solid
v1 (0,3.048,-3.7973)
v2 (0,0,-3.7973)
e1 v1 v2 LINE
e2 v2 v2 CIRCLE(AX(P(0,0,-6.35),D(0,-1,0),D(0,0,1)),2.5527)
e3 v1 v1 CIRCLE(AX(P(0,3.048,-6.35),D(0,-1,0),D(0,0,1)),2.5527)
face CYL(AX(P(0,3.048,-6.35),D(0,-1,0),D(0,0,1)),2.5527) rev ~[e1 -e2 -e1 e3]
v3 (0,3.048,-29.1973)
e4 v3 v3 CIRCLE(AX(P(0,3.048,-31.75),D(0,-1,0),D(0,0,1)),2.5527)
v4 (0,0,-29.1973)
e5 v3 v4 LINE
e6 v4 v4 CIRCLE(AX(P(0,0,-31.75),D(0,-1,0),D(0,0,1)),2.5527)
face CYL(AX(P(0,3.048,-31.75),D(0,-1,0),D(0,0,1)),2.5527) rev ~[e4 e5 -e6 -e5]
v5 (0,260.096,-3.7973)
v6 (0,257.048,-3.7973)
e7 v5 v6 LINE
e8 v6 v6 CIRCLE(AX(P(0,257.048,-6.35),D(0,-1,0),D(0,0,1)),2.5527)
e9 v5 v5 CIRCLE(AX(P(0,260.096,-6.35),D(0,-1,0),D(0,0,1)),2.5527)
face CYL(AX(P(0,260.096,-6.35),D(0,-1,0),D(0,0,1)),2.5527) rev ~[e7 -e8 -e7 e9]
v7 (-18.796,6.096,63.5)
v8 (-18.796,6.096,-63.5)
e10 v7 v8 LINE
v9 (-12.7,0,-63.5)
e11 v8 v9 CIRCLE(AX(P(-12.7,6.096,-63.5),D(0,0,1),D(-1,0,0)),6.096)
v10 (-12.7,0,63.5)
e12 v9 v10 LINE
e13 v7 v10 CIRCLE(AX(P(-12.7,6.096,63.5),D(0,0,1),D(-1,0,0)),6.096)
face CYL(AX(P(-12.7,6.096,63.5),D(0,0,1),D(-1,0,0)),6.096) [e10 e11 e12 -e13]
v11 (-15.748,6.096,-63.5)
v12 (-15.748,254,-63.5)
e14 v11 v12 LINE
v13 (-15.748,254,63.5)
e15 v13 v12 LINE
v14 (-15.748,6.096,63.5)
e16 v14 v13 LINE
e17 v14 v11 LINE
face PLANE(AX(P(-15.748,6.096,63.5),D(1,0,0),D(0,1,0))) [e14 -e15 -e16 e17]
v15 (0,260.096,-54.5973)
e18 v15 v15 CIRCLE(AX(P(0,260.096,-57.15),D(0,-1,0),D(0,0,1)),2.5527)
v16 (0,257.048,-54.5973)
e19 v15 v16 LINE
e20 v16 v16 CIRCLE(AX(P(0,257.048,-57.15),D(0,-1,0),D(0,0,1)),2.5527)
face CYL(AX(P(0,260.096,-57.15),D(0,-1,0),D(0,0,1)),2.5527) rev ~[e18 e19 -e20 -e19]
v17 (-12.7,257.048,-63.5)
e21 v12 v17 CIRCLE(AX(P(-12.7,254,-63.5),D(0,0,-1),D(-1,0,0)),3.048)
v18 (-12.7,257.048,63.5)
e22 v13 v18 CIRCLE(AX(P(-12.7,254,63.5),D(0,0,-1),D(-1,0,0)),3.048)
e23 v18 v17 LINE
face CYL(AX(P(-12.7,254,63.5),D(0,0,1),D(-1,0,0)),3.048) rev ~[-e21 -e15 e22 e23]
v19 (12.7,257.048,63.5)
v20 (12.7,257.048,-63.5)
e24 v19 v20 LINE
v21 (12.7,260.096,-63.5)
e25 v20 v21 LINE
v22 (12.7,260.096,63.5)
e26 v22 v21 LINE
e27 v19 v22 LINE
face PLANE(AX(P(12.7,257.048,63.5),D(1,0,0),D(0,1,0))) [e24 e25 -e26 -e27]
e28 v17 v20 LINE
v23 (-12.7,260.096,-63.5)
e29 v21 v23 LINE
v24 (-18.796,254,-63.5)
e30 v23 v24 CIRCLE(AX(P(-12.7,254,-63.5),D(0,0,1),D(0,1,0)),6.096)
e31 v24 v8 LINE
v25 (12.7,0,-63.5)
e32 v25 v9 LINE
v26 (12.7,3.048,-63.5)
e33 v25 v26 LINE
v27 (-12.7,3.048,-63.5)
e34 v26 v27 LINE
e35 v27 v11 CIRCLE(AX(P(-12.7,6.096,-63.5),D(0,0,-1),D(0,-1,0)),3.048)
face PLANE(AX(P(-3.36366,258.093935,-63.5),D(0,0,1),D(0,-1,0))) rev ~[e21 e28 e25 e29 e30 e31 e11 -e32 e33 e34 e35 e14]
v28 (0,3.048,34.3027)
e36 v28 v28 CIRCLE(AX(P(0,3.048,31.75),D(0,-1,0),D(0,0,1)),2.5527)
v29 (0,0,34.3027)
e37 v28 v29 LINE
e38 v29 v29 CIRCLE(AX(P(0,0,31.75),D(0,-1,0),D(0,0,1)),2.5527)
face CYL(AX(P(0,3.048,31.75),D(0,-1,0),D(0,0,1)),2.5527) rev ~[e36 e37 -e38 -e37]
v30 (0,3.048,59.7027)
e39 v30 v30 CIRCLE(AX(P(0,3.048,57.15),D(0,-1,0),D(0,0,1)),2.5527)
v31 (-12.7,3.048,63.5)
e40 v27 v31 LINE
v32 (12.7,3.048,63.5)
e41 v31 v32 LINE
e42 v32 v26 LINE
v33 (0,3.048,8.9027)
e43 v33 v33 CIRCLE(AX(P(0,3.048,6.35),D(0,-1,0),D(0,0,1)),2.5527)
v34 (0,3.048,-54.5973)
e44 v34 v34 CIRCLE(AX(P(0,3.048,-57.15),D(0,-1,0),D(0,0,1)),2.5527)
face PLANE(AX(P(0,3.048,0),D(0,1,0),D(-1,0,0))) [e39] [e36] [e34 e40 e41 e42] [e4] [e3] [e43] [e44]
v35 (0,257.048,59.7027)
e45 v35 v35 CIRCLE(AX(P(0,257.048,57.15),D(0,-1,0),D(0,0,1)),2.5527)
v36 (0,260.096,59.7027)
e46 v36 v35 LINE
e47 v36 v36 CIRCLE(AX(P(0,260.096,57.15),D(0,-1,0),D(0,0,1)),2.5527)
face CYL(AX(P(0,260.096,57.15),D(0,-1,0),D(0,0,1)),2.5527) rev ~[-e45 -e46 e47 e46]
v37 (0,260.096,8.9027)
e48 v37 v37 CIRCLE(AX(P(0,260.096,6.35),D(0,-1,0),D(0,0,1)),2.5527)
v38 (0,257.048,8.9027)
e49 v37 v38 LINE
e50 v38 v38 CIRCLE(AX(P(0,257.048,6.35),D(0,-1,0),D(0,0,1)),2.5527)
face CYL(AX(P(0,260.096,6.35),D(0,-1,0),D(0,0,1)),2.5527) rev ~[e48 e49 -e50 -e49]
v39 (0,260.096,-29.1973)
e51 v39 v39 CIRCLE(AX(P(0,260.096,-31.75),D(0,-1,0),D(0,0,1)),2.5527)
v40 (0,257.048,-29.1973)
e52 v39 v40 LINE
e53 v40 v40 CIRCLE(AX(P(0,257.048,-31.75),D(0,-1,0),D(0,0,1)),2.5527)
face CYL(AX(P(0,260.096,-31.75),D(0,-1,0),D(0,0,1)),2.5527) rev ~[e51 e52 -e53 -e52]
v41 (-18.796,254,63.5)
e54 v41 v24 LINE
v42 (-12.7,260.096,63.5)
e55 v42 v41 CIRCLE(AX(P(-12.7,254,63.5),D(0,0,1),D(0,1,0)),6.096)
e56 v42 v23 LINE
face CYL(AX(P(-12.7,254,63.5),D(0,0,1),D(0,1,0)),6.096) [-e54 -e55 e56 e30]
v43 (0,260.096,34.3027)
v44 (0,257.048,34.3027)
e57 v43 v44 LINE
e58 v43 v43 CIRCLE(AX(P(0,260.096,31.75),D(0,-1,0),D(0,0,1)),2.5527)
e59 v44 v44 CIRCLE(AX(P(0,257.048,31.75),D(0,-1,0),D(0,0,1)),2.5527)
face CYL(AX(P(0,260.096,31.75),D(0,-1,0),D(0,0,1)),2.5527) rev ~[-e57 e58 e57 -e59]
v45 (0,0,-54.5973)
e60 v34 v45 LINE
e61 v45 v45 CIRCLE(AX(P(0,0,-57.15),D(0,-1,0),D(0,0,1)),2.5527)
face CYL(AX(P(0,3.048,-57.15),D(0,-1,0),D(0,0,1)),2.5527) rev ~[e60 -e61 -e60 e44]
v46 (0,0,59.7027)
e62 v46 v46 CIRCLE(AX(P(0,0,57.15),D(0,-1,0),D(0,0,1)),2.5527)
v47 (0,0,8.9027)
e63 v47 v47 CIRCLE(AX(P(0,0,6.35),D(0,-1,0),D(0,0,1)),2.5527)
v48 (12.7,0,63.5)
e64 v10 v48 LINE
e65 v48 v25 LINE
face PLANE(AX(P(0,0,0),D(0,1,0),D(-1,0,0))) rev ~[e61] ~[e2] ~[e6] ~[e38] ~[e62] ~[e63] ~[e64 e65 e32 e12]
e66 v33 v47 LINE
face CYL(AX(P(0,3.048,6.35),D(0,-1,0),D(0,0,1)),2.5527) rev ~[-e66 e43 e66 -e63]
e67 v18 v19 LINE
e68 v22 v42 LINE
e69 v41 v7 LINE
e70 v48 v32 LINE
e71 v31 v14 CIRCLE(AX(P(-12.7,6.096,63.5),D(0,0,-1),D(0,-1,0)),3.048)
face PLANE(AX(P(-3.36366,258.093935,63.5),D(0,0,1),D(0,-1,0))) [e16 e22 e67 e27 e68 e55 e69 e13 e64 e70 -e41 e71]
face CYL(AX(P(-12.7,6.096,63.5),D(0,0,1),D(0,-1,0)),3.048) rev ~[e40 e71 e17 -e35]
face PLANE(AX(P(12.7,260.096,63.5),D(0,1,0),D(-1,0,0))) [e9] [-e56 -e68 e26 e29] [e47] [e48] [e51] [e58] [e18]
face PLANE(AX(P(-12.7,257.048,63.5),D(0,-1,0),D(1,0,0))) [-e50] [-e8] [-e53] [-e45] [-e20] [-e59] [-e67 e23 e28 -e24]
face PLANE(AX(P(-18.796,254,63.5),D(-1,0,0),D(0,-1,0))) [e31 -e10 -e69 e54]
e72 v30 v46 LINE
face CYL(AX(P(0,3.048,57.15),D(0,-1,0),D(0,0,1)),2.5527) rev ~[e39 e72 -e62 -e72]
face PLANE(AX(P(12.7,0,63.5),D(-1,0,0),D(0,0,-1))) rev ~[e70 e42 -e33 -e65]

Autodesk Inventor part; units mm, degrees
ref_plane "YZ Plane" through (0, 0, 0) normal (1, 0, 0) x (0, 1, 0)
ref_plane "XZ Plane" through (0, 0, 0) normal (0, 1, 0) x (-1, 0, 0)
ref_plane "XY Plane" through (0, 0, 0) normal (0, 0, 1) x (1, 0, 0)
sketch "Sketch1" plane through (0, 0, 0) normal (0, 1, 0) x (-1, 0, 0)
  line L0 (-12.7, -63.5) -> (12.7, -63.5)
  line L1 (12.7, -63.5) -> (12.7, 63.5)
  line L2 (12.7, 63.5) -> (-12.7, 63.5)
  line L3 (-12.7, 63.5) -> (-12.7, -63.5)
  line L4 (-12.7, -63.5) -> (12.7, 63.5) construction
  line L5 (12.7, -63.5) -> (-12.7, 63.5) construction
  point P0 (0, 0)
  dimension "d0" = 25.4
  dimension "d1" = 127
extrude "Plate1" add sketch "Sketch1" along normal blind 3.048
sketch "Sketch2" plane through (-15.748, 6.096, 63.5) normal (-1, 0, 0) x (0, -1, 0)
  line L0 (0, -127) -> (0, 0)
  line L1 (0, 0) -> (-247.904, 0)
  line L2 (-247.904, 0) -> (-247.904, -127)
  line L3 (-247.904, -127) -> (0, -127)
edge flange "Flange1" height 254 angle 90 thickness 3.048 bend radius 3.048 thickness toward (-1, 0, 0) relief tear relief width 3.048 relief depth 1.524 edges at (-12.7, 3.048, 0) wall of the first edge with corners at (-15.748, 6.096, -63.5) (-15.748, 6.096, 63.5) (-15.748, 254, 63.5) (-15.748, 254, -63.5)
bend "Bend1"
corner "Corner1"
sketch "Sketch3" plane through (0, 3.048, 0) normal (0, 1, 0) x (1, 0, 0)
  line L0 (-12.7, 63.5) -> (12.7, 63.5) construction
  line L1 (-12.7, -63.5) -> (-12.7, 63.5) construction
  line L2 (12.7, -63.5) -> (-12.7, -63.5) construction
  line L3 (12.7, 63.5) -> (12.7, -63.5) construction
  line L4 (12.7, 0) -> (-12.7, 0) construction
  point P0 (0, 0)
  point P1 (0, -6.35)
  point P2 (0, 0)
  point P3 (0, -31.75)
  point P4 (0, -57.15)
  point P5 (0, -82.55)
  point P6 (0, -107.95)
  point P7 (0, 6.35)
  point P8 (0, 31.75)
  point P9 (0, 57.15)
  point P10 (0, 82.55)
  point P11 (0, 107.95)
  dimension "d13" = 6.35
  dimension "d16" = 25.4
  dimension "d21" = 12.7
hole "Hole1" at (0, 3.048, 6.35) at (0, 3.048, 31.75) at (0, 3.048, 57.15) at (0, 3.048, 82.55) at (0, 3.048, -82.55) at (0, 3.048, -57.15) at (0, 3.048, -31.75) at (0, 3.048, -6.35) direction (0, -1, 0) diameter 5.1054 end through all clearance for "Flat Head Machine Screw (82)" size "#10" standard "Ansi Unified Screw Threads"
sketch "Sketch4" plane through (-12.7, 257.048, 63.5) normal (0, 1, 0) x (-1, 0, 0)
  line L0 (0, -127) -> (0, 0)
  line L1 (0, 0) -> (-25.4, 0)
  line L2 (-25.4, 0) -> (-25.4, -127)
  line L3 (-25.4, -127) -> (0, -127)
edge flange "Flange2" height 31.496 angle 90 thickness 3.048 bend radius 3.048 thickness toward (0, 1, 0) relief tear relief width 3.048 relief depth 1.524 edges at (-15.748, 254, 0) wall of the first edge with corners at (-12.7, 257.048, -63.5) (-12.7, 257.048, 63.5) (12.7, 257.048, 63.5) (12.7, 257.048, -63.5)
bend "Bend2"
corner "Corner2"
sketch "Sketch5" plane through (12.7, 260.096, 63.5) normal (0, 1, 0) x (1, 0, 0)
  circle A0 centre (-12.7, 6.35) radius 2.5527 construction
  circle A1 centre (-12.7, 31.75) radius 2.5527 construction
  circle A2 centre (-12.7, 57.15) radius 2.5527 construction
  circle A3 centre (-12.7, 69.85) radius 2.5527 construction
  circle A4 centre (-12.7, 95.25) radius 2.5527 construction
  circle A5 centre (-12.7, 120.65) radius 2.5527 construction
  point P0 (-12.7, 63.5)
  point P1 (-12.7, 6.35)
  point P2 (-12.7, 31.75)
  point P3 (-12.7, 57.15)
  point P4 (-12.7, 69.85)
  point P5 (-12.7, 95.25)
  point P6 (-12.7, 120.65)
hole "Hole2" at (0, 260.096, 57.15) at (0, 260.096, 31.75) at (0, 260.096, 6.35) at (0, 260.096, -6.35) at (0, 260.096, -31.75) at (0, 260.096, -57.15) direction (0, -1, 0) diameter 5.1054 end through all clearance for "Flat Head Machine Screw (82)" size "#10" standard "Ansi Unified Screw Threads"
equation "\"d27\" = Thickness"
equation "\"d44\" = Thickness"
equation "\"d2\" = Thickness"
equation "\"d3\" = BendReliefWidth"
equation "\"d4\" = BendReliefDepth"
equation "\"d5\" = MinimumRemnant"
equation "\"d6\" = TransitionRadius"
equation "\"d9\" = BendRadius"
equation "\"d10\" = CornerReliefSize"
equation "\"d11\" = GapSize"
equation "\"d12\" = JacobiRadiusSize"
equation "\"d29\" = BendReliefWidth"
equation "\"d30\" = BendReliefDepth"
equation "\"d31\" = MinimumRemnant"
equation "\"d32\" = TransitionRadius"
equation "\"d35\" = BendRadius"
equation "\"d36\" = CornerReliefSize"
equation "\"d37\" = GapSize"
equation "\"d38\" = JacobiRadiusSize"
equation "\"BendRadius\" = Thickness"
equation "\"BendReliefWidth\" = Thickness"
equation "\"BendReliefDepth\" = 0.5 * Thickness"
equation "\"CornerReliefSize\" = 4 * Thickness"
equation "\"MinimumRemnant\" = 2 * Thickness"
equation "\"TransitionRadius\" = BendRadius"
equation "\"JacobiRadiusSize\" = BendRadius"
equation "\"GapSize\" = Thickness"
equation "\"Thickness\" = 3.048"
properties part number "trough_back_support" material "Aluminum 6061"
